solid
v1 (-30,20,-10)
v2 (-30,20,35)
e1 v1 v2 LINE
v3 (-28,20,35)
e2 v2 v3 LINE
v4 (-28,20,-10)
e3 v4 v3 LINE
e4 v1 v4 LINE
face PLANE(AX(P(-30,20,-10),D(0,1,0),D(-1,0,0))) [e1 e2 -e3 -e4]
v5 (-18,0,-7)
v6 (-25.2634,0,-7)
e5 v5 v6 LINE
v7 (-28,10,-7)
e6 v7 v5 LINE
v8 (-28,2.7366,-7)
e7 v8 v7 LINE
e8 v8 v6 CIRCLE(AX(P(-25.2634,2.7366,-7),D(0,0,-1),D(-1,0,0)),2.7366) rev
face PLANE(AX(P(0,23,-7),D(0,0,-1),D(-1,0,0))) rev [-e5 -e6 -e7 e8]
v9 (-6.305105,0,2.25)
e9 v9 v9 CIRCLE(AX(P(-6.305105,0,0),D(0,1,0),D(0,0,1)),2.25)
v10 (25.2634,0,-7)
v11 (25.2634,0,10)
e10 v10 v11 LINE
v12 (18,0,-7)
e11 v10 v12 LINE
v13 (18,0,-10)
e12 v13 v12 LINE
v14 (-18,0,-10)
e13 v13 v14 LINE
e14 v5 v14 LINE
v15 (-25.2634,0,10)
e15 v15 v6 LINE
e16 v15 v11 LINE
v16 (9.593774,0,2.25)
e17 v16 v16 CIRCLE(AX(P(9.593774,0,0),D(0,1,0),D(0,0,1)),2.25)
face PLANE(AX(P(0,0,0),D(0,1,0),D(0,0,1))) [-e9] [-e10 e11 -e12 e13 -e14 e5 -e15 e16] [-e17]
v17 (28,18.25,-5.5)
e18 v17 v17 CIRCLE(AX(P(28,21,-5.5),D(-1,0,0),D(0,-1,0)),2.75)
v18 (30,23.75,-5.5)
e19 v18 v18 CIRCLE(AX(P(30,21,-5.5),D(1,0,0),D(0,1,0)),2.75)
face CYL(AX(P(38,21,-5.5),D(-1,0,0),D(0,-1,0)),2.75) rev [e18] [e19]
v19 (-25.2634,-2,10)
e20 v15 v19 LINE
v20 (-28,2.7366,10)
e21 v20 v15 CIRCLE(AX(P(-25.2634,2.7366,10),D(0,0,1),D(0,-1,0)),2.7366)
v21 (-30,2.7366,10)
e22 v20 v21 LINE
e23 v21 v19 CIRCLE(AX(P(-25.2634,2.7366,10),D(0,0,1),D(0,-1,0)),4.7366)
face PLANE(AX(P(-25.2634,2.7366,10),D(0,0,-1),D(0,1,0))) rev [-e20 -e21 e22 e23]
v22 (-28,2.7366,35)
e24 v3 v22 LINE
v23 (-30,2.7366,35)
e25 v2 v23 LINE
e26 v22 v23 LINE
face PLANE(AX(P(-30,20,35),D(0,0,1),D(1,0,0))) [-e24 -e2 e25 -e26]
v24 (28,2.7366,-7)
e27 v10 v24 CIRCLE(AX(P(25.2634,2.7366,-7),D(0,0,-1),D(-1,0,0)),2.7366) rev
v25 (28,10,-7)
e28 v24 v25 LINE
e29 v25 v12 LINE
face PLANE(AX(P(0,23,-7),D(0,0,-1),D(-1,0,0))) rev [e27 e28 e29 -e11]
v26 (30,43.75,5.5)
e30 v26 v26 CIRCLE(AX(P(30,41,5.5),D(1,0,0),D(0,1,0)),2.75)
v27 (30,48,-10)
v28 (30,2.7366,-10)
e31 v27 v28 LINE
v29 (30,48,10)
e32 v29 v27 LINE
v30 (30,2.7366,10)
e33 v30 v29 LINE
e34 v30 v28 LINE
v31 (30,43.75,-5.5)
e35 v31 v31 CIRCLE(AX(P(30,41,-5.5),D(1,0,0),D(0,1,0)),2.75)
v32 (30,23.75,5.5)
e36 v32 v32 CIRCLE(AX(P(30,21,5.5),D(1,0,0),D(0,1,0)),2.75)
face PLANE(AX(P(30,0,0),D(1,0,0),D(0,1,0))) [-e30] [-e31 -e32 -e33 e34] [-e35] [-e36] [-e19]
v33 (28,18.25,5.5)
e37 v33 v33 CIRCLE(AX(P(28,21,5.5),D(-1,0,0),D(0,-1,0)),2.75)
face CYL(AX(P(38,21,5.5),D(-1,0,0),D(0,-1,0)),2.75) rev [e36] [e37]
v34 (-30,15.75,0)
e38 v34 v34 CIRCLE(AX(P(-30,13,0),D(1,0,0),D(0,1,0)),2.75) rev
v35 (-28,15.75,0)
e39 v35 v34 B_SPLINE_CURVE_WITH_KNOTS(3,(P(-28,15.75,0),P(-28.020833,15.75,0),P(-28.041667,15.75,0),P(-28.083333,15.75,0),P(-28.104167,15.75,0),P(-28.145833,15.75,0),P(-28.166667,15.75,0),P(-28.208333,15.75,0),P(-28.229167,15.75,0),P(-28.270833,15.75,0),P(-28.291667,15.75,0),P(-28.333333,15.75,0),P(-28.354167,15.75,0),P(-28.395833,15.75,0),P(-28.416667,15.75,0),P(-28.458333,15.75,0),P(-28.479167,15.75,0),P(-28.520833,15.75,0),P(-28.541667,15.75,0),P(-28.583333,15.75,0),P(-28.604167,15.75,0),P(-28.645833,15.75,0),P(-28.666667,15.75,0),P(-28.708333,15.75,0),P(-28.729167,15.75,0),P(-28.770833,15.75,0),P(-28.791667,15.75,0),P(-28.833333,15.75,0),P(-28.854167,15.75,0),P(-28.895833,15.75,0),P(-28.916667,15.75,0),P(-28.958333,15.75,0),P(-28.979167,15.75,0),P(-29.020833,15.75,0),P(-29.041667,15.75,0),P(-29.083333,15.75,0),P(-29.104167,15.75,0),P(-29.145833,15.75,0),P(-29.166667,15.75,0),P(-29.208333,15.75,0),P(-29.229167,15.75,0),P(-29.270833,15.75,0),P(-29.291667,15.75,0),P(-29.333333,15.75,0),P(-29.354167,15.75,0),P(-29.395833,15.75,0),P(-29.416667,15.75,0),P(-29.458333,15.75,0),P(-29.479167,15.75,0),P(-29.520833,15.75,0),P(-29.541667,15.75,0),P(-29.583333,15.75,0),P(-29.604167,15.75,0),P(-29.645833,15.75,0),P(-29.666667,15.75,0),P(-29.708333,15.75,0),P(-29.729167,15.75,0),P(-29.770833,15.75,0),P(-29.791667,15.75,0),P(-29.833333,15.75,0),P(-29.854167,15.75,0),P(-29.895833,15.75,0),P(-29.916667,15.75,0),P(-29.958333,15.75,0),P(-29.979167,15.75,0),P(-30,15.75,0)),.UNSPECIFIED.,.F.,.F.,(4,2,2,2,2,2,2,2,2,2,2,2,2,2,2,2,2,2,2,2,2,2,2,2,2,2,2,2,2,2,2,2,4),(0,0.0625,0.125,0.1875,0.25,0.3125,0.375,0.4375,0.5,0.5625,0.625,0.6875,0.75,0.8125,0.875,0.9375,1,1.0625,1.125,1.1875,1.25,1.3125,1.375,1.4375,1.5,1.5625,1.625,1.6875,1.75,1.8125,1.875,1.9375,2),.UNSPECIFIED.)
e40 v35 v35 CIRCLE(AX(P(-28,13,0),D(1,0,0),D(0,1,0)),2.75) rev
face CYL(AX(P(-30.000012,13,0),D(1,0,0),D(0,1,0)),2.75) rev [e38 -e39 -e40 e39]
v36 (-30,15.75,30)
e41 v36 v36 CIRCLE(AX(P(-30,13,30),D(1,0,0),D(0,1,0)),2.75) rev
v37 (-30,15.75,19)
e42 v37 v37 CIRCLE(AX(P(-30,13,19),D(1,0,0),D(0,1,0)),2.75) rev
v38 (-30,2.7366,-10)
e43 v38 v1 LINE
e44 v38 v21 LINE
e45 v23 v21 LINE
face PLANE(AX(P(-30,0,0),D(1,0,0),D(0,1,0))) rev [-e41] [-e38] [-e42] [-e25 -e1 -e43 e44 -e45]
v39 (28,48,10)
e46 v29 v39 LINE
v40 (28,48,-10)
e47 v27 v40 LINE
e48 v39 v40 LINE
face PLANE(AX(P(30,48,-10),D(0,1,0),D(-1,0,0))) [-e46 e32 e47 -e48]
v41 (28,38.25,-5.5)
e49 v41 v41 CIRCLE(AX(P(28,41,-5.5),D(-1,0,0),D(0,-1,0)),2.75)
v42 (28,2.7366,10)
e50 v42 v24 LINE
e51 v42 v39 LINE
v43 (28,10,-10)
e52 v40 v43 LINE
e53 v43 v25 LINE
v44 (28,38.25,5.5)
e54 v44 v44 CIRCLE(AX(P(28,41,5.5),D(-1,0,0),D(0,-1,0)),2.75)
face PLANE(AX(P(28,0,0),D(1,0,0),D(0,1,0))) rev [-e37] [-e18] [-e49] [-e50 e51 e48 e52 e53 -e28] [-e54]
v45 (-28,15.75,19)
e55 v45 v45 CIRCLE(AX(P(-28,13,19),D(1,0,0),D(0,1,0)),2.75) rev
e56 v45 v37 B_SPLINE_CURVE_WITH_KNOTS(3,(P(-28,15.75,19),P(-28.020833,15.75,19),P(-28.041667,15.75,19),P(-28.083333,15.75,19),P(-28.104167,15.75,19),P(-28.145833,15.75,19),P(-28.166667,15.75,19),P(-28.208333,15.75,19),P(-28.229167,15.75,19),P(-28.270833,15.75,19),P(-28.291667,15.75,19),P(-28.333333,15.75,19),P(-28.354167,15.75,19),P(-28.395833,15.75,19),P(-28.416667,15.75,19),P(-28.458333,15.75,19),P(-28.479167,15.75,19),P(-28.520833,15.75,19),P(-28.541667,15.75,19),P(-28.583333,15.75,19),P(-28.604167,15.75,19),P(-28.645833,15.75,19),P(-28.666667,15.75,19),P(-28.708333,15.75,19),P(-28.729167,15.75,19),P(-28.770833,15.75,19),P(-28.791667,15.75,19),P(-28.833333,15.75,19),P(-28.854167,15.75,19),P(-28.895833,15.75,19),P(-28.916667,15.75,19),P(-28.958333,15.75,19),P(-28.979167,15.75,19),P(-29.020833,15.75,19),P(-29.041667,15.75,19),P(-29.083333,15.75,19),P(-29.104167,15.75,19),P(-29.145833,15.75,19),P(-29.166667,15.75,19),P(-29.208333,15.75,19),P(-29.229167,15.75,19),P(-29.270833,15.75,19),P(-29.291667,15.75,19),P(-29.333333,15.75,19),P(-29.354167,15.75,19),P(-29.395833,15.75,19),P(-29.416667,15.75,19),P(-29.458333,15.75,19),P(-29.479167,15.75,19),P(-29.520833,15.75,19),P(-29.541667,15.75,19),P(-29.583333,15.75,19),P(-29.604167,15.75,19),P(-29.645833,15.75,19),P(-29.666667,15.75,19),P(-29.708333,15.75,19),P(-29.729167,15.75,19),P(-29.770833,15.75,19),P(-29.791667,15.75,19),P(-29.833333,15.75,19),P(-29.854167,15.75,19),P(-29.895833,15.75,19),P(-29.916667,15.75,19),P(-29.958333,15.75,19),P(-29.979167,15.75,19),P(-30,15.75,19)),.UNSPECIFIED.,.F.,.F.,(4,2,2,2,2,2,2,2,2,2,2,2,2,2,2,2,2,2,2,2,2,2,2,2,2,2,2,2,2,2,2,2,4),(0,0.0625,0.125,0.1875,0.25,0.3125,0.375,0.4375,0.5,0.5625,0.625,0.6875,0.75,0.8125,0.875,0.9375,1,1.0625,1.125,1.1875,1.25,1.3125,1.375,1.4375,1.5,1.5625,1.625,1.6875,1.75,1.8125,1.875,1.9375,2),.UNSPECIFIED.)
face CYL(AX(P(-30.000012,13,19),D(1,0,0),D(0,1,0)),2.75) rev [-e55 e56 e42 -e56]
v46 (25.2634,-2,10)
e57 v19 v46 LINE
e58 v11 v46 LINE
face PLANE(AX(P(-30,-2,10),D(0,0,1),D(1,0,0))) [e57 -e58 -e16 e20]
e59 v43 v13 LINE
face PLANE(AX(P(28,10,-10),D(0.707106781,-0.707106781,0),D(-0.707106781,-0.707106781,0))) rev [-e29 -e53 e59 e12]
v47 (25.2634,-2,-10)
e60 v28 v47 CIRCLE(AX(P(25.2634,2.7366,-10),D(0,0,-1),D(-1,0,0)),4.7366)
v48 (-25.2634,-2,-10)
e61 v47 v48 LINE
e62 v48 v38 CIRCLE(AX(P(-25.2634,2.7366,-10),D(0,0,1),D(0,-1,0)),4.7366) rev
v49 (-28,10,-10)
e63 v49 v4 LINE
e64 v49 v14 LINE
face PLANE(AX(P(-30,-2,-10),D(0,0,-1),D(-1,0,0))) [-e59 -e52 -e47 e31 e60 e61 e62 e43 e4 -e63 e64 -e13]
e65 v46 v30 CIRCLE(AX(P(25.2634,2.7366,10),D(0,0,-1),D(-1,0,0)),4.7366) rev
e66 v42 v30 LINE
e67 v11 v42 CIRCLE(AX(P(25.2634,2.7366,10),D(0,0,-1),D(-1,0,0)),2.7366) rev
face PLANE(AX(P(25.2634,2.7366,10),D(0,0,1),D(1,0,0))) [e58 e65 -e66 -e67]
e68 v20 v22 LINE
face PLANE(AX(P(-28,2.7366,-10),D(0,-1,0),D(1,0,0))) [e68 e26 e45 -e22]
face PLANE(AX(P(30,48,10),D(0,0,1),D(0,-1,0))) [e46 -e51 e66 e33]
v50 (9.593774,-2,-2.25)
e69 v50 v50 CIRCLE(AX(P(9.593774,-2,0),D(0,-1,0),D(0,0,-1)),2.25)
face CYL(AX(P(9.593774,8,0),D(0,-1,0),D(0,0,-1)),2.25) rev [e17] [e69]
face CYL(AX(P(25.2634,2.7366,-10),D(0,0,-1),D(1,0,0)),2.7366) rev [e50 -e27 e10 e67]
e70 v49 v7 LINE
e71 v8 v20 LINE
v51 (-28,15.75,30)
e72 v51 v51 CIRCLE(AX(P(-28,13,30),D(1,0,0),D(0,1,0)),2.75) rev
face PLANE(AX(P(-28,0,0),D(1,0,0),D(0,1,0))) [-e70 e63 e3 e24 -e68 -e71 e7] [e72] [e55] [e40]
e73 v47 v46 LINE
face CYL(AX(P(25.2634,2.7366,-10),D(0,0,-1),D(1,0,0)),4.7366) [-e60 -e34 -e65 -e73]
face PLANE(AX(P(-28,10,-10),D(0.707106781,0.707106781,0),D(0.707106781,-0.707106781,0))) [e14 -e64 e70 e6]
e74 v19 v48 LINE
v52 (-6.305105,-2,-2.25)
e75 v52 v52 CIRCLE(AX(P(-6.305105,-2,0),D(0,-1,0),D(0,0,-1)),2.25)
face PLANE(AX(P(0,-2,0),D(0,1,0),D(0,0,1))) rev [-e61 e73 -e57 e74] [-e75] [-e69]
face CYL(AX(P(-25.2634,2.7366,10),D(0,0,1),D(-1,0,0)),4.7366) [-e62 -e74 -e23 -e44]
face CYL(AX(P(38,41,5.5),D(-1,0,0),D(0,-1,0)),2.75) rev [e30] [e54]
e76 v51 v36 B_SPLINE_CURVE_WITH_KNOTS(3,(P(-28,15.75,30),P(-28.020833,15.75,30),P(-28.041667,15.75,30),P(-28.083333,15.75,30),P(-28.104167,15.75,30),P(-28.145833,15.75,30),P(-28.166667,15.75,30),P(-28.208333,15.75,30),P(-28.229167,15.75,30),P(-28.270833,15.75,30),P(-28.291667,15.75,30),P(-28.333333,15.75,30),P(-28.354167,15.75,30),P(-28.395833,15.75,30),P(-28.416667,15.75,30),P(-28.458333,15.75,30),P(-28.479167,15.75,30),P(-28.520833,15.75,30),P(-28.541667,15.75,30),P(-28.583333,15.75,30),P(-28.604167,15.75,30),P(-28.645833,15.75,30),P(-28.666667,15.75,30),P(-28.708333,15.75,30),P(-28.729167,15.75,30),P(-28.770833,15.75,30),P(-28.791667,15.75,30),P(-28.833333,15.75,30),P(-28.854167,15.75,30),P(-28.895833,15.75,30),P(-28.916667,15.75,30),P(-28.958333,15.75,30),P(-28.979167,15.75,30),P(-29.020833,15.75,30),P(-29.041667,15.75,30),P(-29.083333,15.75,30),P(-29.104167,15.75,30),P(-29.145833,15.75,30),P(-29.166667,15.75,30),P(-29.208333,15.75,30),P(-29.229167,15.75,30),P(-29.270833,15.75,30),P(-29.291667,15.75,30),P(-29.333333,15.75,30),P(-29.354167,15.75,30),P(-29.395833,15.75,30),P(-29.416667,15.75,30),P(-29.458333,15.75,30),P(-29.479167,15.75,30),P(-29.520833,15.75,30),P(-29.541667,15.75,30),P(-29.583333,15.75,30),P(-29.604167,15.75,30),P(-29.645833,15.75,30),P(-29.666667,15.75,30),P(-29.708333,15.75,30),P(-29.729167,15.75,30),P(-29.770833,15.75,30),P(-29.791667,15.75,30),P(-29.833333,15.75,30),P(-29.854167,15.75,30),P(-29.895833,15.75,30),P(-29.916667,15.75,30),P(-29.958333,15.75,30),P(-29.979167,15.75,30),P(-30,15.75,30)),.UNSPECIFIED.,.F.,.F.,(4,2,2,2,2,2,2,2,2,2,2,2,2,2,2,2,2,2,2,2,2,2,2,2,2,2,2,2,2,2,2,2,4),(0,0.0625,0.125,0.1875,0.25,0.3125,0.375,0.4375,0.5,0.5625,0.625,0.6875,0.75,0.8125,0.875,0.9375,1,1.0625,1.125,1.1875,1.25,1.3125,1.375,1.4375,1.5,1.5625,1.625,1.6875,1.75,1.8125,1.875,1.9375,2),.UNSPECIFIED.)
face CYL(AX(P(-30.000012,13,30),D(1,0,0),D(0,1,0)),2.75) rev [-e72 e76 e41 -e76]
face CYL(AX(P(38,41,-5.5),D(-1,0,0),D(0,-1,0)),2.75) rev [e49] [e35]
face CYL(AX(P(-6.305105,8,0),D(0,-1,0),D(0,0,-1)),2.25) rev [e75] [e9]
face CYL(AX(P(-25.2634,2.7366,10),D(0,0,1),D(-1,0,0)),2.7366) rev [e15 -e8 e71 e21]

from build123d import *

# Parameters (mm, degrees)
SKETCH_1_W                         = 60
SKETCH_1_H                         = 20
SM_BASE_FLANGE_1_DEPTH             = 2
SM_EDGE_FLANGE_1_STRIP_W           = 13.4732
SM_EDGE_FLANGE_1_STRIP_H           = 2
SM_EDGE_FLANGE_1_STRIP_CUT_DEPTH   = 20
SM_EDGE_FLANGE_1_STRIP_2_W         = 13.4732
SM_EDGE_FLANGE_1_STRIP_2_H         = 2
SM_EDGE_FLANGE_1_STRIP_CUT_2_DEPTH = 20
SM_EDGE_FLANGE_1_DEPTH             = 20
SM_EDGE_FLANGE_1_BEND_DEPTH        = 20
SM_EDGE_FLANGE_1_PROFILE_W         = 45
SM_EDGE_FLANGE_1_PROFILE_H         = 17.2634
SM_EDGE_FLANGE_1_FLAT_DEPTH        = 2
RIB_2_REACH                        = 74.312
SKETCH_12_WALL_W                   = 160.765785142
SKETCH_12_WALL_H                   = 3
CUT_EXTRUDE_1_REACH                = 86.433
SKETCH_13_R                        = 2.75
CUT_EXTRUDE_1_DIRECTION_2_DEPTH    = 85.433405711
SKETCH_15_R                        = 2.75
CUT_EXTRUDE_2_DEPTH                = 10
SKETCH_16_R                        = 2.25
CUT_EXTRUDE_3_DEPTH                = 10


# Sheet-metal steps are written as plain solids
with BuildPart() as part:
    # Sketch 1 → 基体-法兰1 (new body)
    with BuildSketch(Plane(origin=(0, 0, 0), x_dir=(1, 0, 0), z_dir=(0, 1, 0))):
        Rectangle(SKETCH_1_W, SKETCH_1_H)
    extrude(amount=-SM_BASE_FLANGE_1_DEPTH)

    # 边线-法兰1 strip (across the edge) → 边线-法兰1 strip cut (cut)
    with BuildSketch(Plane(origin=(30, 0, 10), x_dir=(-1, 0, 0), z_dir=(0, 0, -1))):
        with Locations((-2, -1)):
            Rectangle(SM_EDGE_FLANGE_1_STRIP_W, SM_EDGE_FLANGE_1_STRIP_H)
    extrude(amount=SM_EDGE_FLANGE_1_STRIP_CUT_DEPTH, mode=Mode.SUBTRACT)

    # 边线-法兰1 strip 2 (across the edge) → 边线-法兰1 strip cut 2 (cut)
    with BuildSketch(Plane(origin=(-30, 0, -10), x_dir=(1, 0, 0), z_dir=(0, 0, 1))):
        with Locations((-2, -1)):
            Rectangle(SM_EDGE_FLANGE_1_STRIP_2_W, SM_EDGE_FLANGE_1_STRIP_2_H)
    extrude(amount=SM_EDGE_FLANGE_1_STRIP_CUT_2_DEPTH, mode=Mode.SUBTRACT)

    # 边线-法兰1 section (across the edge) → 边线-法兰1 (add)
    with BuildSketch(Plane(origin=(30, 0, 10), x_dir=(-1, 0, 0), z_dir=(0, 0, -1))):
        with BuildLine():
            Line((0, 2.7366), (0, 48))
            Line((0, 48), (2, 48))
            Line((2, 48), (2, 2.7366))
            ThreePointArc((2, 2.7366), (2.801531583, 0.801531583), (4.7366, 0))
            Line((4.7366, 0), (4.7366, -2))
            ThreePointArc((4.7366, -2), (1.38731802, -0.61268198), (0, 2.7366))
        make_face()
    extrude(amount=SM_EDGE_FLANGE_1_DEPTH)

    # 边线-法兰1 bend section (across the edge) → 边线-法兰1 bend (add)
    with BuildSketch(Plane(origin=(-30, 0, -10), x_dir=(1, 0, 0), z_dir=(0, 0, 1))):
        with BuildLine():
            Line((0, 2.7366), (2, 2.7366))
            ThreePointArc((2, 2.7366), (2.801531583, 0.801531583), (4.7366, 0))
            Line((4.7366, 0), (4.7366, -2))
            ThreePointArc((4.7366, -2), (1.38731802, -0.61268198), (0, 2.7366))
        make_face()
    extrude(amount=SM_EDGE_FLANGE_1_BEND_DEPTH)

    # 边线-法兰1 profile (on flange) → 边线-法兰1 flat (add)
    with BuildSketch(Plane(origin=(-30, 0, 0), x_dir=(0, 0, -1), z_dir=(1, 0, 0))):
        with Locations((-12.5, 11.3683)):
            Rectangle(SM_EDGE_FLANGE_1_PROFILE_W, SM_EDGE_FLANGE_1_PROFILE_H)
    extrude(amount=SM_EDGE_FLANGE_1_FLAT_DEPTH)

    # 草图12 wall → 筋2 (add, up to next)
    with BuildSketch(Plane(origin=(-23, 5, -10), x_dir=(0.707106781187, -0.707106781187, 0), z_dir=(-0.707106781187, -0.707106781187, 0)), mode=Mode.PRIVATE) as rib_2_sk1:
        with Locations((0, 1.5)):
            Rectangle(SKETCH_12_WALL_W, SKETCH_12_WALL_H)
    rib_2_tool1 = extrude(rib_2_sk1.sketch, amount=RIB_2_REACH, mode=Mode.PRIVATE) - part.part
    rib_2 = rib_2_tool1.solids().sort_by_distance((-23, 5, -10))[0]
    add(rib_2)

    # 镜向1: 筋2 across plane
    add(rib_2.mirror(Plane(origin=(0, 0, 0), x_dir=(0, 0, 1), z_dir=(1, 0, 0))))

    # 草图13 → 切除-拉伸1 (cut, up to next)
    with BuildSketch(Plane.ZY.offset(30), mode=Mode.PRIVATE) as cut_extrude_1_sk1:
        with Locations(Location((0, 13, 0), (0, 0, 90))):
            Circle(SKETCH_13_R)
    cut_extrude_1_tool1 = extrude(cut_extrude_1_sk1.sketch, amount=-CUT_EXTRUDE_1_REACH, mode=Mode.PRIVATE) & part.part
    # 草图13 → 切除-拉伸1 (cut, up to next)
    with BuildSketch(Plane.ZY.offset(30), mode=Mode.PRIVATE) as cut_extrude_1_sk2:
        with Locations(Location((19, 13, 0), (0, 0, 90))):
            Circle(SKETCH_13_R)
    cut_extrude_1_tool2 = extrude(cut_extrude_1_sk2.sketch, amount=-CUT_EXTRUDE_1_REACH, mode=Mode.PRIVATE) & part.part
    # 草图13 → 切除-拉伸1 (cut, up to next)
    with BuildSketch(Plane.ZY.offset(30), mode=Mode.PRIVATE) as cut_extrude_1_sk3:
        with Locations(Location((30, 13, 0), (0, 0, 90))):
            Circle(SKETCH_13_R)
    cut_extrude_1_tool3 = extrude(cut_extrude_1_sk3.sketch, amount=-CUT_EXTRUDE_1_REACH, mode=Mode.PRIVATE) & part.part
    add(cut_extrude_1_tool1.solids().sort_by_distance((-30, 13, 0))[0], mode=Mode.SUBTRACT)
    add(cut_extrude_1_tool2.solids().sort_by_distance((-30, 13, 19))[0], mode=Mode.SUBTRACT)
    add(cut_extrude_1_tool3.solids().sort_by_distance((-30, 13, 30))[0], mode=Mode.SUBTRACT)

    # 草图13 → 切除-拉伸1 direction 2 (cut)
    with BuildSketch(Plane.ZY.offset(30)):
        with Locations(Location((0, 13, 0), (0, 0, 90))):
            Circle(SKETCH_13_R)
        with Locations(Location((19, 13, 0), (0, 0, 90))):
            Circle(SKETCH_13_R)
        with Locations(Location((30, 13, 0), (0, 0, 90))):
            Circle(SKETCH_13_R)
    extrude(amount=CUT_EXTRUDE_1_DIRECTION_2_DEPTH, mode=Mode.SUBTRACT)

    # 草图15 → 切除-拉伸2 (cut)
    with BuildSketch(Plane.ZY.offset(-28)):
        with Locations(Location((-5.5, 21, 0), (0, 0, 270))):
            Circle(SKETCH_15_R)
        with Locations(Location((5.5, 21, 0), (0, 0, 270))):
            Circle(SKETCH_15_R)
        with Locations(Location((5.5, 41, 0), (0, 0, 270))):
            Circle(SKETCH_15_R)
        with Locations(Location((-5.5, 41, 0), (0, 0, 270))):
            Circle(SKETCH_15_R)
    extrude(amount=-CUT_EXTRUDE_2_DEPTH, mode=Mode.SUBTRACT)

    # 草图16 → 切除-拉伸3 (cut)
    with BuildSketch(Plane.XZ.offset(2)):
        with Locations(Location((9.593773501, 0, 0), (0, 0, 270))):
            Circle(SKETCH_16_R)
        with Locations(Location((-6.30510484, 0, 0), (0, 0, 270))):
            Circle(SKETCH_16_R)
    extrude(amount=-CUT_EXTRUDE_3_DEPTH, mode=Mode.SUBTRACT)


solid = part.part
